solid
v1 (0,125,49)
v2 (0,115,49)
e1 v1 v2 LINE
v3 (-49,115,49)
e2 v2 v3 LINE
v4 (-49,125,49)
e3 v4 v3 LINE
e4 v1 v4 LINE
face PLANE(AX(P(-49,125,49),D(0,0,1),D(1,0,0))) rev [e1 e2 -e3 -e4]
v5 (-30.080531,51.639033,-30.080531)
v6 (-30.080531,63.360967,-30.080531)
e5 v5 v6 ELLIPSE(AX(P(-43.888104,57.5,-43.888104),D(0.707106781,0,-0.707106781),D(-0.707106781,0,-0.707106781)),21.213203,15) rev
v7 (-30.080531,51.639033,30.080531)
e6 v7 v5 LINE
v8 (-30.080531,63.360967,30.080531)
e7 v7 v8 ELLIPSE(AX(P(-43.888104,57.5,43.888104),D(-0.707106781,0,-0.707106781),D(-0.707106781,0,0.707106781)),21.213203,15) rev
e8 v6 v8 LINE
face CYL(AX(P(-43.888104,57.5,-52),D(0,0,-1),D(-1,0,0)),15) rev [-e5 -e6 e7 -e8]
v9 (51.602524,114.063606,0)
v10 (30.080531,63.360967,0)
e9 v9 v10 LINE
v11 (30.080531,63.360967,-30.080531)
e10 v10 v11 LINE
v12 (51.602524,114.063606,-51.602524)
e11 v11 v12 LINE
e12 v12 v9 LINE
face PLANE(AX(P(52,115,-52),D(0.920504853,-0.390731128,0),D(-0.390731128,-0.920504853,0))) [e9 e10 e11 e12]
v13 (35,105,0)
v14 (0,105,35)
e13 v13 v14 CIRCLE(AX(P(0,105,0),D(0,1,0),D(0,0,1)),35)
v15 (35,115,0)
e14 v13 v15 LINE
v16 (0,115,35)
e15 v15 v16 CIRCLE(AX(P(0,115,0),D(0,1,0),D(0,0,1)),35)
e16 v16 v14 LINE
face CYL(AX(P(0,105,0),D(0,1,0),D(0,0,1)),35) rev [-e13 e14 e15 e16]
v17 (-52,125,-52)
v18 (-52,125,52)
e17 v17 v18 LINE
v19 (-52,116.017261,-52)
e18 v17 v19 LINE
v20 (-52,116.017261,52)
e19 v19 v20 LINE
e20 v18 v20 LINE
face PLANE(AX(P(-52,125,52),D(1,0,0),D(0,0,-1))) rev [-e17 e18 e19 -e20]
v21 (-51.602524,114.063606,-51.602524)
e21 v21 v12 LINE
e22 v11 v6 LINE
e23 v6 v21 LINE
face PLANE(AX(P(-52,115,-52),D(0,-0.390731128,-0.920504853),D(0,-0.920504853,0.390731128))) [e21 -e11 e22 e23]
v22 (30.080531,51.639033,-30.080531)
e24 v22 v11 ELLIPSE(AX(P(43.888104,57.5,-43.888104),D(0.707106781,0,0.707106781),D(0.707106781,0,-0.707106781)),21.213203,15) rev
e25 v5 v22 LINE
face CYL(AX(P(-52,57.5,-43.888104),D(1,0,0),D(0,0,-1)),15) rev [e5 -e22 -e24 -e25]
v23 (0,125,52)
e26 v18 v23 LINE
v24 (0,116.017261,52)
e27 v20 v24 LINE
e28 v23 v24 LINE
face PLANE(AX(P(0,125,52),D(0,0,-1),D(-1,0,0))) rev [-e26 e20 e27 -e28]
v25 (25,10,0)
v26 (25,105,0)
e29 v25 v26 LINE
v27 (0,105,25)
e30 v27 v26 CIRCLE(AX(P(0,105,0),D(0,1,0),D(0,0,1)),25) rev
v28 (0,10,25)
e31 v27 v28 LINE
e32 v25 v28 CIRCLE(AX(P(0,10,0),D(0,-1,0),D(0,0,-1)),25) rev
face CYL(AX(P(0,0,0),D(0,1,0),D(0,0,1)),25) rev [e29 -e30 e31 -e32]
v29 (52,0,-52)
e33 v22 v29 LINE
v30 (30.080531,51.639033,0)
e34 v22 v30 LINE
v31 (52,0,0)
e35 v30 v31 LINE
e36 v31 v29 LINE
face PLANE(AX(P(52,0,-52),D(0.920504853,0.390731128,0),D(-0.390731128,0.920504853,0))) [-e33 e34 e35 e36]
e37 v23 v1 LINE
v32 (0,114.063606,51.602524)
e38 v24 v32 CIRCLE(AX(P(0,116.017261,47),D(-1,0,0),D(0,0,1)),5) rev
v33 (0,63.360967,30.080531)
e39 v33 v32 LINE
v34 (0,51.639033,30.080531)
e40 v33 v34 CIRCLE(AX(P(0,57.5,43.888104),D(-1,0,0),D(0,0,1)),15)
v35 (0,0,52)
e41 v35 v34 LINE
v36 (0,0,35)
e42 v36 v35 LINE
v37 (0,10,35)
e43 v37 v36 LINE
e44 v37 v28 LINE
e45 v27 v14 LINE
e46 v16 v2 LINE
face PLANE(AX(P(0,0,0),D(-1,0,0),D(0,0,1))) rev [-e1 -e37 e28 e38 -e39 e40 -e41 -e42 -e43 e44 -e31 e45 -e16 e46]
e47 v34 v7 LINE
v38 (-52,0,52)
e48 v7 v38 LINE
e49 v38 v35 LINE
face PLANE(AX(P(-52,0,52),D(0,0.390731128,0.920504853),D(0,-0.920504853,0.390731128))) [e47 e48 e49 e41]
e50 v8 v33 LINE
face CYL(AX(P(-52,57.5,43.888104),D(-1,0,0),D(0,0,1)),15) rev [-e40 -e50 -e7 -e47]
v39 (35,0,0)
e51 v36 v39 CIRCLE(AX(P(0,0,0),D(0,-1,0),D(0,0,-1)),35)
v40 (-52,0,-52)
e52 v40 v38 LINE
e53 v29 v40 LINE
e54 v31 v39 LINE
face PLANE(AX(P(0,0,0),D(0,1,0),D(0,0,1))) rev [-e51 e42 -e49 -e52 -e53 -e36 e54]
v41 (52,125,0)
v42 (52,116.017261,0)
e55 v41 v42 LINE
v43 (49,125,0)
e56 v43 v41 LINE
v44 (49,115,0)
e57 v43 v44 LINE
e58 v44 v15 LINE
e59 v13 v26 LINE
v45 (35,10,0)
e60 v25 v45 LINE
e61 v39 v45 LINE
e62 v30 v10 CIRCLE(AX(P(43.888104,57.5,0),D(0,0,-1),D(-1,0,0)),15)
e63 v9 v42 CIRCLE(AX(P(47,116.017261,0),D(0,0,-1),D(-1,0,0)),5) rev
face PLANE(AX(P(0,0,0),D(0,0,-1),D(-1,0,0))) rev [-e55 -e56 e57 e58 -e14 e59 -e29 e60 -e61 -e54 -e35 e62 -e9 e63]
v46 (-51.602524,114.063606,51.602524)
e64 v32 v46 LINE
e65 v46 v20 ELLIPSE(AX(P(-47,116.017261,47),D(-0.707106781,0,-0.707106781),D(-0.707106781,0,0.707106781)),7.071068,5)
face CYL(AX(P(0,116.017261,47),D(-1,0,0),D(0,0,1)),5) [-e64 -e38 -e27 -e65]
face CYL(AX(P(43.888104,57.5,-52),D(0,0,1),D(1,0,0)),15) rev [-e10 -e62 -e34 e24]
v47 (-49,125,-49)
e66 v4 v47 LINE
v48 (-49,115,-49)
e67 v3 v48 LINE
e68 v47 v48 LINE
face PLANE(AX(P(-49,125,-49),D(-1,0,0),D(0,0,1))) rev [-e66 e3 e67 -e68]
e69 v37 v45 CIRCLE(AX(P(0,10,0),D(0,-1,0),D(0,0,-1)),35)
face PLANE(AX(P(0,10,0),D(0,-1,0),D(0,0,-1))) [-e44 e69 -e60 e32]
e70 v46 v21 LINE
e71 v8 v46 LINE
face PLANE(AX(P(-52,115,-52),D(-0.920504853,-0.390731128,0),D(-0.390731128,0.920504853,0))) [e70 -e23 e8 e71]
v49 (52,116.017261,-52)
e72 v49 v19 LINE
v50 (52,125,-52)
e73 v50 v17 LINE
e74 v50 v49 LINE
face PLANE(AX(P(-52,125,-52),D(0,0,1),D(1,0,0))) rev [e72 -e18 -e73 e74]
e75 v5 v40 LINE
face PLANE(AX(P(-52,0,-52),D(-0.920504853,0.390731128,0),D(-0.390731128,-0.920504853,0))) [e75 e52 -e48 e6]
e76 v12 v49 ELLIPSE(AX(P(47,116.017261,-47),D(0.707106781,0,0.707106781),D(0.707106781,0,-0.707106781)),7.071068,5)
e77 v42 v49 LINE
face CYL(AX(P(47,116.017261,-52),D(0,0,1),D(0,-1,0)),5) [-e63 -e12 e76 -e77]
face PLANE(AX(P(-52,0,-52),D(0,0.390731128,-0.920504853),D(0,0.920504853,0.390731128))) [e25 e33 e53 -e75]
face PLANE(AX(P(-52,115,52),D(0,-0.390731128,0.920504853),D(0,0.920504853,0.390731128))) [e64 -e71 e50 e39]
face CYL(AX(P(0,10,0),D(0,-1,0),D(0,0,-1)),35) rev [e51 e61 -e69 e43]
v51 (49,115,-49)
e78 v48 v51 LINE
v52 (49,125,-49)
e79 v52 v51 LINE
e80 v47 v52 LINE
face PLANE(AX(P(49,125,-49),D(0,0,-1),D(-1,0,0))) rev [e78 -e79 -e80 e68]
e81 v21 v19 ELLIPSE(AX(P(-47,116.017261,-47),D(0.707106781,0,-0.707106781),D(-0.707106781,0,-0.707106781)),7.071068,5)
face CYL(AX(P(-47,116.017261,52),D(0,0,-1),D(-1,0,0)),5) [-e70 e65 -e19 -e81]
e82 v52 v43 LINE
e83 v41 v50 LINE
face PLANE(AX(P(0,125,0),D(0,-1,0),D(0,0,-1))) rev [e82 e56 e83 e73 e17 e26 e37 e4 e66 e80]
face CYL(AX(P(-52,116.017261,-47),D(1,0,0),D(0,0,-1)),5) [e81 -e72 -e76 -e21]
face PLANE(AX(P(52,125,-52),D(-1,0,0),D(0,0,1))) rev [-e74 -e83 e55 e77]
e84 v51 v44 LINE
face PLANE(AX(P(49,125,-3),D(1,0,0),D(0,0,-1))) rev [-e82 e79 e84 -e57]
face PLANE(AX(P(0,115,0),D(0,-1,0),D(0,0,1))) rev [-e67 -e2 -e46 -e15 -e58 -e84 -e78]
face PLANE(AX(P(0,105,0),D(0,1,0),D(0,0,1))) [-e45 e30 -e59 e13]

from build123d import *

# Parameters (mm, degrees)
SKETCH1_W           = 104
SKETCH1_H           = 104
BOSS_EXTRUDE1_DEPTH = 57.5
BOSS_EXTRUDE1_TAPER = 23
SKETCH2_R           = 25
CUT_EXTRUDE2_DEPTH  = 137.502747386
SKETCH3_R           = 35
CUT_EXTRUDE4_DEPTH  = 10
CUT_EXTRUDE5_START  = -10
SKETCH4_R           = 35
CUT_EXTRUDE5_DEPTH  = 10
SKETCH5_W           = 52
SKETCH5_H           = 52
CUT_EXTRUDE6_DEPTH  = 137.502747386
FILLET1_R           = 15
BOSS_EXTRUDE3_DEPTH = 10
FILLET2_R           = 5


with BuildPart() as part:
    # Sketch1 → Boss-Extrude1 (new body)
    with BuildSketch(Plane(origin=(0, 0, 0), x_dir=(1, 0, 0), z_dir=(0, 1, 0))):
        Rectangle(SKETCH1_W, SKETCH1_H)
    extrude(amount=BOSS_EXTRUDE1_DEPTH, taper=BOSS_EXTRUDE1_TAPER)

    # Mirror1: part across plane


with BuildPart() as part_1:
    add(part.part)
    add(part.part.mirror(Plane.ZX.offset(57.5)))

    # Sketch2 → Cut-Extrude2 (cut, through all)
    with BuildSketch(Plane(origin=(0, 115, 0), x_dir=(1, 0, 0), z_dir=(0, 1, 0))):
        with Locations(Location((0, 0, 0), (0, 0, 270))):
            Circle(SKETCH2_R)
    extrude(amount=-CUT_EXTRUDE2_DEPTH, mode=Mode.SUBTRACT)

    # Sketch3 → Cut-Extrude4 (cut)
    with BuildSketch(Plane(origin=(0, 115, 0), x_dir=(1, 0, 0), z_dir=(0, 1, 0))):
        with Locations(Location((0, 0, 0), (0, 0, 270))):
            Circle(SKETCH3_R)
    extrude(amount=-CUT_EXTRUDE4_DEPTH, mode=Mode.SUBTRACT)

    # Sketch4 → Cut-Extrude5 (cut)
    with BuildSketch(Plane.XZ.offset(CUT_EXTRUDE5_START)):
        with Locations(Location((0, 0, 0), (0, 0, 90))):
            Circle(SKETCH4_R)
    extrude(amount=CUT_EXTRUDE5_DEPTH, mode=Mode.SUBTRACT)

    # Sketch5 → Cut-Extrude6 (cut, through all)
    with BuildSketch(Plane(origin=(0, 115, 0), x_dir=(1, 0, 0), z_dir=(0, 1, 0))):
        with Locations((26, -26)):
            Rectangle(SKETCH5_W, SKETCH5_H)
    extrude(amount=-CUT_EXTRUDE6_DEPTH, mode=Mode.SUBTRACT)

    # Fillet1
    # the kernel refuses this fillet: 15 mm, written as the material it adds along each edge
    with BuildSketch(Plane(origin=(43.510503676, 57.5, -27.592698068), x_dir=(0, -0.9205048534524403, -0.3907311284892741), z_dir=(-1, 0, 0))) as fillet1_piece_1_section:
        with BuildLine():
            CenterArc((FILLET1_R * 0.42447481621, -FILLET1_R), FILLET1_R, 90, 46)
            Line((-FILLET1_R * 0.294864984129, -FILLET1_R * 0.305341629541), (0, 0))
            Line((0, 0), (FILLET1_R * 0.42447481621, 0))
        make_face()
    fillet1_piece_1 = extrude(amount=87.021007352, mode=Mode.PRIVATE)
    fillet1_piece_1 = fillet1_piece_1 - Plane(origin=(43.888103729, 57.5, -27.592698068), x_dir=(-0.9205048534524399, -0.39073112848927477, 0), z_dir=(0, 0, 1)) * Cylinder(15, 200, mode=Mode.PRIVATE)
    fillet1_piece_1 = fillet1_piece_1 - Plane(origin=(-43.888103729, 57.5, -27.592698068), x_dir=(0.9205048534524399, -0.3907311284892748, 0), z_dir=(0, 0, -1)) * Cylinder(15, 200, mode=Mode.PRIVATE)
    add(fillet1_piece_1)
    with BuildSketch(Plane(origin=(-27.592698068, 57.5, -43.510503676), x_dir=(-0.3907311284892741, -0.9205048534524403, 0), z_dir=(0, 0, 1))) as fillet1_piece_2_section:
        with BuildLine():
            CenterArc((FILLET1_R * 0.42447481621, -FILLET1_R), FILLET1_R, 90, 46)
            Line((-FILLET1_R * 0.294864984129, -FILLET1_R * 0.305341629541), (0, 0))
            Line((0, 0), (FILLET1_R * 0.42447481621, 0))
        make_face()
    fillet1_piece_2 = extrude(amount=87.021007352, mode=Mode.PRIVATE)
    fillet1_piece_2 = fillet1_piece_2 - Plane(origin=(-27.592698068, 57.5, 43.888103729), x_dir=(0, -0.39073112848927466, -0.9205048534524399), z_dir=(-1, 0, 0)) * Cylinder(15, 200, mode=Mode.PRIVATE)
    fillet1_piece_2 = fillet1_piece_2 - Plane(origin=(-27.592698068, 57.5, -43.888103729), x_dir=(0, -0.39073112848927477, 0.9205048534524399), z_dir=(1, 0, 0)) * Cylinder(15, 200, mode=Mode.PRIVATE)
    add(fillet1_piece_2)
    with BuildSketch(Plane(origin=(-43.510503676, 57.5, 27.592698068), x_dir=(0, -0.9205048534524398, 0.39073112848927505), z_dir=(1, 0, 0))) as fillet1_piece_3_section:
        with BuildLine():
            CenterArc((FILLET1_R * 0.42447481621, -FILLET1_R), FILLET1_R, 90, 46)
            Line((-FILLET1_R * 0.294864984129, -FILLET1_R * 0.305341629541), (0, 0))
            Line((0, 0), (FILLET1_R * 0.42447481621, 0))
        make_face()
    fillet1_piece_3 = extrude(amount=43.510503676, mode=Mode.PRIVATE)
    fillet1_piece_3 = fillet1_piece_3 - Plane(origin=(-43.888103729, 57.5, 27.592698068), x_dir=(0.9205048534524399, -0.3907311284892748, 0), z_dir=(0, 0, -1)) * Cylinder(15, 113, mode=Mode.PRIVATE)
    add(fillet1_piece_3)
    with BuildSketch(Plane(origin=(27.592698068, 57.5, 0), x_dir=(0.3907311284892755, -0.9205048534524396, 0), z_dir=(0, 0, -1))) as fillet1_piece_4_section:
        with BuildLine():
            CenterArc((FILLET1_R * 0.42447481621, -FILLET1_R), FILLET1_R, 90, 46)
            Line((-FILLET1_R * 0.294864984129, -FILLET1_R * 0.305341629541), (0, 0))
            Line((0, 0), (FILLET1_R * 0.42447481621, 0))
        make_face()
    fillet1_piece_4 = extrude(amount=43.510503676, mode=Mode.PRIVATE)
    fillet1_piece_4 = fillet1_piece_4 - Plane(origin=(27.592698068, 57.5, -43.888103729), x_dir=(0, -0.39073112848927477, 0.9205048534524399), z_dir=(1, 0, 0)) * Cylinder(15, 113, mode=Mode.PRIVATE)
    add(fillet1_piece_4)

    # Sketch6 → Boss-Extrude3 (add)
    with BuildSketch(Plane(origin=(0, 115, 0), x_dir=(1, 0, 0), z_dir=(0, 1, 0))):
        Polygon((49, 3), (49, 0), (52, 0), (52, 52), (-52, 52), (-52, -52), (0, -52), (0, -49), (-3, -49), (-49, -49), (-49, 49), (49, 49), align=None)
    extrude(amount=BOSS_EXTRUDE3_DEPTH)

    # Fillet2
    fillet2_edges = [part_1.edges().sort_by_distance(p)[0] for p in [
        (0, 115, -52),
        (-52, 115, 0),
        (-26, 115, 52),
        (52, 115, -26),
    ]]
    fillet(fillet2_edges, radius=FILLET2_R)


solid = part_1.part
